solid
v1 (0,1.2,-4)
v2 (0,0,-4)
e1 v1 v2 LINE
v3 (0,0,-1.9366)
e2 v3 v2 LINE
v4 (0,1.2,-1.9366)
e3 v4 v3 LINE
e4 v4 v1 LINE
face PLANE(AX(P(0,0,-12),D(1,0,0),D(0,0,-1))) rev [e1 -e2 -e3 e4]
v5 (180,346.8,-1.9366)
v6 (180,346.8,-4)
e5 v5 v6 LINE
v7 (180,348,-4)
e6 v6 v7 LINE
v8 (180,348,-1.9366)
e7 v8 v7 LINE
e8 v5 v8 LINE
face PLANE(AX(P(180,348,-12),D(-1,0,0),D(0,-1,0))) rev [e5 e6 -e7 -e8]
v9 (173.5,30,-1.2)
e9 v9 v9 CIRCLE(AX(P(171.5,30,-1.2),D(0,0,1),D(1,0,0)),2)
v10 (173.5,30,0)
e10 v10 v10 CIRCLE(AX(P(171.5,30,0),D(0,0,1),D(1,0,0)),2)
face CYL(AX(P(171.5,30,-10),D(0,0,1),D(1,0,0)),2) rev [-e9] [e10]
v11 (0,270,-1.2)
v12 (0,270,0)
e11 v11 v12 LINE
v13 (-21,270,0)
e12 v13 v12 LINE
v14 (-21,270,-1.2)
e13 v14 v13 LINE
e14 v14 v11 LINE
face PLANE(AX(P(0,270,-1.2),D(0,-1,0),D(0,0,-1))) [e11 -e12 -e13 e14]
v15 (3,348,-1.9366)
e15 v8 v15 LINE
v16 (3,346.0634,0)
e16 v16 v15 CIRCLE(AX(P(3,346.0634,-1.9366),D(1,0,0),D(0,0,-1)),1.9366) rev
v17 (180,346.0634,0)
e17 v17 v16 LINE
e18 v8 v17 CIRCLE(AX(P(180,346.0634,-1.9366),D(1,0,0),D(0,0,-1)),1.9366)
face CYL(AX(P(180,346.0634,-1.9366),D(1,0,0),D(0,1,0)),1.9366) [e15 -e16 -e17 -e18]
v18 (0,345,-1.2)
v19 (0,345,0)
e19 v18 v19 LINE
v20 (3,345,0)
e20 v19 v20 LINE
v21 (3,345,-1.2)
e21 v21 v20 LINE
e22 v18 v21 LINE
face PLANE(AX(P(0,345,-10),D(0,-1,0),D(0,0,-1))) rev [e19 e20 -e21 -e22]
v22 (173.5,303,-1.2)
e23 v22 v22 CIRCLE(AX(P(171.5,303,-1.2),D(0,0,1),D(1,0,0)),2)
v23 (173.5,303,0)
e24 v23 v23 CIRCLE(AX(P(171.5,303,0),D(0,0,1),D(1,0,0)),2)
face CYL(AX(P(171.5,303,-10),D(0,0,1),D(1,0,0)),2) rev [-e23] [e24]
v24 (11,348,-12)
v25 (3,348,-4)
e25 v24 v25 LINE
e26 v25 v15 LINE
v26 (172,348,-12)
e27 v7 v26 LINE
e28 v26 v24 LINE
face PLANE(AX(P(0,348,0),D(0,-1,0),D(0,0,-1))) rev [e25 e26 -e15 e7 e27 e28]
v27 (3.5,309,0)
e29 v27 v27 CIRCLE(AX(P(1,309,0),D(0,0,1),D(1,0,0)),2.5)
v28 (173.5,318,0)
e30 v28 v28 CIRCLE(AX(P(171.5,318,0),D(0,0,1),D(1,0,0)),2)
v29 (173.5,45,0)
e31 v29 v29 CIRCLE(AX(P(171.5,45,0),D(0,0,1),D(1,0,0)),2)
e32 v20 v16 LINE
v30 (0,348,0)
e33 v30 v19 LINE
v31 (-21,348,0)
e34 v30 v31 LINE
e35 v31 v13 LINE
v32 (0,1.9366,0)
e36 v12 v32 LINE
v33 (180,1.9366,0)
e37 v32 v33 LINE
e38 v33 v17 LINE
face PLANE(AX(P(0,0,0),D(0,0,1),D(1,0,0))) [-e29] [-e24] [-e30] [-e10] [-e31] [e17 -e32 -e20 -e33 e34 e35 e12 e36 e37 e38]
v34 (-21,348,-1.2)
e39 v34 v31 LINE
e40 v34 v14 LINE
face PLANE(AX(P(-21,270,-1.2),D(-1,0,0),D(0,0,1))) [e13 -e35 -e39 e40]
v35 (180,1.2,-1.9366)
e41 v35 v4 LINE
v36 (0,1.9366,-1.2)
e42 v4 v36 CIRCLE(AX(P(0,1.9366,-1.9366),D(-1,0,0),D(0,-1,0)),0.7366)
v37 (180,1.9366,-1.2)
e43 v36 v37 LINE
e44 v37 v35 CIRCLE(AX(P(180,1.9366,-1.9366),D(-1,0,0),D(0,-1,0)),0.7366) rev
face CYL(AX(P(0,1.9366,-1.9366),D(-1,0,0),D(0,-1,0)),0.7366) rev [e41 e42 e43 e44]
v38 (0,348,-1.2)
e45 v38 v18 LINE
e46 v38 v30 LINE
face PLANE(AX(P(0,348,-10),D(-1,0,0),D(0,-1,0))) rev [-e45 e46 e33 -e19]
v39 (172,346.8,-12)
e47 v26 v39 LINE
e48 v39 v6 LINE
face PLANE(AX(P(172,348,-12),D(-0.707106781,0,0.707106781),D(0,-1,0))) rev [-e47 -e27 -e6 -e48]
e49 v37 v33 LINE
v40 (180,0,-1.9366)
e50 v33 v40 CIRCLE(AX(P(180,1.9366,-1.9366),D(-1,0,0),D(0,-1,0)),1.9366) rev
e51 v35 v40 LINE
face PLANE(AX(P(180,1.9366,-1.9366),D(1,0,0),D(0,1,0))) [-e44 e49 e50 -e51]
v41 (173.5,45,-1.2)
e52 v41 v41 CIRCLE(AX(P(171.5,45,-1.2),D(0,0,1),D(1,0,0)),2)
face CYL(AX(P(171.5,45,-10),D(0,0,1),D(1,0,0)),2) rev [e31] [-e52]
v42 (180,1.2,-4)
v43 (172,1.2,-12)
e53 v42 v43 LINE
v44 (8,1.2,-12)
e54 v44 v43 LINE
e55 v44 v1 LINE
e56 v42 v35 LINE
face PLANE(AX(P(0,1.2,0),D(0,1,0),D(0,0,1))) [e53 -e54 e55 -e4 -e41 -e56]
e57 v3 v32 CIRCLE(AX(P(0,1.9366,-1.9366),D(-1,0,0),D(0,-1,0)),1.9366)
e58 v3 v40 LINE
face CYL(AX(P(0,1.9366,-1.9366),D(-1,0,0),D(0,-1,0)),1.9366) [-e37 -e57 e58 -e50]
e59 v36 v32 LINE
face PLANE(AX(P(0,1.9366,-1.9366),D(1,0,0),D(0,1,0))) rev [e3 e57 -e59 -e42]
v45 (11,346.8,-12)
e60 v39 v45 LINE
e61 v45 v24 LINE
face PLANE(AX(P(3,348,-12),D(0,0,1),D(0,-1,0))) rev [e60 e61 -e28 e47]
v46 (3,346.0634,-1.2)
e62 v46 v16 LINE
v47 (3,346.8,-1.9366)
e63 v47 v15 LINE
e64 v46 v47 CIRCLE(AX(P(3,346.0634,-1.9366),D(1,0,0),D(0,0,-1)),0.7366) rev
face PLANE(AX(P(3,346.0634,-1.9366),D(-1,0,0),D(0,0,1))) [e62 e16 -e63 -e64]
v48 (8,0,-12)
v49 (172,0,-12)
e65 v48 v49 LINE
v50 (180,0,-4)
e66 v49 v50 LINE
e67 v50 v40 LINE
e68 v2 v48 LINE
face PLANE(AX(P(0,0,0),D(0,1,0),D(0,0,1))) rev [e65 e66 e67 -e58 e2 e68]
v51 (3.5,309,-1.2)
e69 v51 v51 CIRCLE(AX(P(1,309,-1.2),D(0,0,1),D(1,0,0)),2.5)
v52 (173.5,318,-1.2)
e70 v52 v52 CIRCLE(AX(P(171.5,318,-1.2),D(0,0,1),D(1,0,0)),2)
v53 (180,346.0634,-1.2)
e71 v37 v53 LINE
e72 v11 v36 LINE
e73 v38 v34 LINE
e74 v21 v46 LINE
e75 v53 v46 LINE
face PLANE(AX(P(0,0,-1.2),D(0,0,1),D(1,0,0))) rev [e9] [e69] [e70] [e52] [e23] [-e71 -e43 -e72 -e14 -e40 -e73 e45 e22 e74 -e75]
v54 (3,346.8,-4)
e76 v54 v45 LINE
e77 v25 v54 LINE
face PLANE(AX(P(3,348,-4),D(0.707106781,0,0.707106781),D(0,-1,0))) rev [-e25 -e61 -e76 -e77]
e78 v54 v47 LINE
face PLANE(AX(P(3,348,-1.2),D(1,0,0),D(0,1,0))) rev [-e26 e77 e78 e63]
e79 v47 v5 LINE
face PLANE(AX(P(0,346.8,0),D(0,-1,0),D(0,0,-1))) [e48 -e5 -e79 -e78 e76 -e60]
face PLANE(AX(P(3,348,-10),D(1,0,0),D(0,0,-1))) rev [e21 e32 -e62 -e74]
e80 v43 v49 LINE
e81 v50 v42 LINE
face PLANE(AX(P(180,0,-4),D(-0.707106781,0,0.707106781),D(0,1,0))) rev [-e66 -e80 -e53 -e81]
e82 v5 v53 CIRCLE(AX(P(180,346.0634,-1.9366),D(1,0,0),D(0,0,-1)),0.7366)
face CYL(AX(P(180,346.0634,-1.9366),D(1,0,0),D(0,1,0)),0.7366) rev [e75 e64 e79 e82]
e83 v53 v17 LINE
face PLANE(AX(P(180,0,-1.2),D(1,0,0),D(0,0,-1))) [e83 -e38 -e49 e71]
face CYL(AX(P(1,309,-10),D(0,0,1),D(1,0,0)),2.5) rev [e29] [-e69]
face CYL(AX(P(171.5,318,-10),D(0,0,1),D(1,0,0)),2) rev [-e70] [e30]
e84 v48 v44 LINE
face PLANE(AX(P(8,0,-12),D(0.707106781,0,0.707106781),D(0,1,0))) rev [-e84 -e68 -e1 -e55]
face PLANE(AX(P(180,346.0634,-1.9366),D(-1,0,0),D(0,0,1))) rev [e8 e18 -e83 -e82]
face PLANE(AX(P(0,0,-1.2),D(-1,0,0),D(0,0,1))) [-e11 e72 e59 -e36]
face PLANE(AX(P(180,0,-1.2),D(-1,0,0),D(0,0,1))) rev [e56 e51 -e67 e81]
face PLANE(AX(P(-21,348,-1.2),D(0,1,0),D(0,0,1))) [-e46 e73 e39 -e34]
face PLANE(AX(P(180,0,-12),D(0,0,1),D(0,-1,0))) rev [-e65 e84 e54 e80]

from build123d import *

# Parameters (mm, degrees)
SM_BASE_FLANGE_1_DEPTH             = 1.2
SKETCH_6_R                         = 2.5
CUT_EXTRUDE_1_DEPTH                = 10
SKETCH_7_R                         = 2
CUT_EXTRUDE_2_DEPTH                = 10
SKETCH_8_W                         = 3
SKETCH_8_H                         = 3
CUT_EXTRUDE_3_DEPTH                = 10
SM_EDGE_FLANGE_1_STRIP_W           = 6.2732
SM_EDGE_FLANGE_1_STRIP_H           = 1.2
SM_EDGE_FLANGE_1_STRIP_CUT_DEPTH   = 177
SM_EDGE_FLANGE_1_STRIP_2_W         = 6.2732
SM_EDGE_FLANGE_1_STRIP_2_H         = 1.2
SM_EDGE_FLANGE_1_STRIP_CUT_2_DEPTH = 180
SM_EDGE_FLANGE_1_DEPTH             = 177
SM_EDGE_FLANGE_1_BEND_DEPTH        = 180
CHAMFER_1_SIZE                     = 8


# Sheet-metal steps are written as plain solids
with BuildPart() as part:
    # Sketch 1 → Базовая кромка1 (new body)
    with BuildSketch(Plane.XY):
        Polygon((0, 270), (-21, 270), (-21, 348), (180, 348), (180, 0), (0, 0), align=None)
    extrude(amount=-SM_BASE_FLANGE_1_DEPTH)

    # Эскиз6 → Вырез-Вытянуть1 (cut)
    with BuildSketch(Plane.XY):
        with Locations((1, 309)):
            Circle(SKETCH_6_R)
    extrude(amount=-CUT_EXTRUDE_1_DEPTH, mode=Mode.SUBTRACT)

    # Эскиз7 → Вырез-Вытянуть2 (cut)
    with BuildSketch(Plane.XY):
        with Locations((171.5, 318)):
            Circle(SKETCH_7_R)
        with Locations((171.5, 303)):
            Circle(SKETCH_7_R)
        with Locations((171.5, 45)):
            Circle(SKETCH_7_R)
        with Locations((171.5, 30)):
            Circle(SKETCH_7_R)
    extrude(amount=-CUT_EXTRUDE_2_DEPTH, mode=Mode.SUBTRACT)

    # Эскиз8 → Вырез-Вытянуть3 (cut)
    with BuildSketch(Plane.XY):
        with Locations((1.5, 346.5)):
            Rectangle(SKETCH_8_W, SKETCH_8_H)
    extrude(amount=-CUT_EXTRUDE_3_DEPTH, mode=Mode.SUBTRACT)

    # Ребро-кромка1 strip (across the edge) → Ребро-кромка1 strip cut (cut)
    with BuildSketch(Plane(origin=(3, 348, -1.2), x_dir=(0, -1, 0), z_dir=(1, 0, 0))):
        with Locations((-1.2, -0.6)):
            Rectangle(SM_EDGE_FLANGE_1_STRIP_W, SM_EDGE_FLANGE_1_STRIP_H)
    extrude(amount=SM_EDGE_FLANGE_1_STRIP_CUT_DEPTH, mode=Mode.SUBTRACT)

    # Ребро-кромка1 strip 2 (across the edge) → Ребро-кромка1 strip cut 2 (cut)
    with BuildSketch(Plane(origin=(180, 0, -1.2), x_dir=(0, 1, 0), z_dir=(-1, 0, 0))):
        with Locations((-1.2, -0.6)):
            Rectangle(SM_EDGE_FLANGE_1_STRIP_2_W, SM_EDGE_FLANGE_1_STRIP_2_H)
    extrude(amount=SM_EDGE_FLANGE_1_STRIP_CUT_2_DEPTH, mode=Mode.SUBTRACT)

    # Ребро-кромка1 section (across the edge) → Ребро-кромка1 (add)
    with BuildSketch(Plane(origin=(3, 348, -1.2), x_dir=(0, -1, 0), z_dir=(1, 0, 0))):
        with BuildLine():
            Line((0, 0.7366), (0, 10.8))
            Line((0, 10.8), (1.2, 10.8))
            Line((1.2, 10.8), (1.2, 0.7366))
            ThreePointArc((1.2, 0.7366), (1.415745145, 0.215745145), (1.9366, 0))
            Line((1.9366, 0), (1.9366, -1.2))
            ThreePointArc((1.9366, -1.2), (0.567217008, -0.632782992), (0, 0.7366))
        make_face()
    extrude(amount=SM_EDGE_FLANGE_1_DEPTH)

    # Ребро-кромка1 section 2 (across the edge) → Ребро-кромка1 bend (add)
    with BuildSketch(Plane(origin=(180, 0, -1.2), x_dir=(0, 1, 0), z_dir=(-1, 0, 0))):
        with BuildLine():
            Line((0, 0.7366), (0, 10.8))
            Line((0, 10.8), (1.2, 10.8))
            Line((1.2, 10.8), (1.2, 0.7366))
            ThreePointArc((1.2, 0.7366), (1.415745145, 0.215745145), (1.9366, 0))
            Line((1.9366, 0), (1.9366, -1.2))
            ThreePointArc((1.9366, -1.2), (0.567217008, -0.632782992), (0, 0.7366))
        make_face()
    extrude(amount=SM_EDGE_FLANGE_1_BEND_DEPTH)

    # Фаска1
    chamfer_1_edges = [part.edges().sort_by_distance(p)[0] for p in [
        (3, 347.4, -12),
        (180, 347.4, -12),
        (180, 0.6, -12),
        (0, 0.6, -12),
    ]]
    chamfer(chamfer_1_edges, length=CHAMFER_1_SIZE)


solid = part.part
